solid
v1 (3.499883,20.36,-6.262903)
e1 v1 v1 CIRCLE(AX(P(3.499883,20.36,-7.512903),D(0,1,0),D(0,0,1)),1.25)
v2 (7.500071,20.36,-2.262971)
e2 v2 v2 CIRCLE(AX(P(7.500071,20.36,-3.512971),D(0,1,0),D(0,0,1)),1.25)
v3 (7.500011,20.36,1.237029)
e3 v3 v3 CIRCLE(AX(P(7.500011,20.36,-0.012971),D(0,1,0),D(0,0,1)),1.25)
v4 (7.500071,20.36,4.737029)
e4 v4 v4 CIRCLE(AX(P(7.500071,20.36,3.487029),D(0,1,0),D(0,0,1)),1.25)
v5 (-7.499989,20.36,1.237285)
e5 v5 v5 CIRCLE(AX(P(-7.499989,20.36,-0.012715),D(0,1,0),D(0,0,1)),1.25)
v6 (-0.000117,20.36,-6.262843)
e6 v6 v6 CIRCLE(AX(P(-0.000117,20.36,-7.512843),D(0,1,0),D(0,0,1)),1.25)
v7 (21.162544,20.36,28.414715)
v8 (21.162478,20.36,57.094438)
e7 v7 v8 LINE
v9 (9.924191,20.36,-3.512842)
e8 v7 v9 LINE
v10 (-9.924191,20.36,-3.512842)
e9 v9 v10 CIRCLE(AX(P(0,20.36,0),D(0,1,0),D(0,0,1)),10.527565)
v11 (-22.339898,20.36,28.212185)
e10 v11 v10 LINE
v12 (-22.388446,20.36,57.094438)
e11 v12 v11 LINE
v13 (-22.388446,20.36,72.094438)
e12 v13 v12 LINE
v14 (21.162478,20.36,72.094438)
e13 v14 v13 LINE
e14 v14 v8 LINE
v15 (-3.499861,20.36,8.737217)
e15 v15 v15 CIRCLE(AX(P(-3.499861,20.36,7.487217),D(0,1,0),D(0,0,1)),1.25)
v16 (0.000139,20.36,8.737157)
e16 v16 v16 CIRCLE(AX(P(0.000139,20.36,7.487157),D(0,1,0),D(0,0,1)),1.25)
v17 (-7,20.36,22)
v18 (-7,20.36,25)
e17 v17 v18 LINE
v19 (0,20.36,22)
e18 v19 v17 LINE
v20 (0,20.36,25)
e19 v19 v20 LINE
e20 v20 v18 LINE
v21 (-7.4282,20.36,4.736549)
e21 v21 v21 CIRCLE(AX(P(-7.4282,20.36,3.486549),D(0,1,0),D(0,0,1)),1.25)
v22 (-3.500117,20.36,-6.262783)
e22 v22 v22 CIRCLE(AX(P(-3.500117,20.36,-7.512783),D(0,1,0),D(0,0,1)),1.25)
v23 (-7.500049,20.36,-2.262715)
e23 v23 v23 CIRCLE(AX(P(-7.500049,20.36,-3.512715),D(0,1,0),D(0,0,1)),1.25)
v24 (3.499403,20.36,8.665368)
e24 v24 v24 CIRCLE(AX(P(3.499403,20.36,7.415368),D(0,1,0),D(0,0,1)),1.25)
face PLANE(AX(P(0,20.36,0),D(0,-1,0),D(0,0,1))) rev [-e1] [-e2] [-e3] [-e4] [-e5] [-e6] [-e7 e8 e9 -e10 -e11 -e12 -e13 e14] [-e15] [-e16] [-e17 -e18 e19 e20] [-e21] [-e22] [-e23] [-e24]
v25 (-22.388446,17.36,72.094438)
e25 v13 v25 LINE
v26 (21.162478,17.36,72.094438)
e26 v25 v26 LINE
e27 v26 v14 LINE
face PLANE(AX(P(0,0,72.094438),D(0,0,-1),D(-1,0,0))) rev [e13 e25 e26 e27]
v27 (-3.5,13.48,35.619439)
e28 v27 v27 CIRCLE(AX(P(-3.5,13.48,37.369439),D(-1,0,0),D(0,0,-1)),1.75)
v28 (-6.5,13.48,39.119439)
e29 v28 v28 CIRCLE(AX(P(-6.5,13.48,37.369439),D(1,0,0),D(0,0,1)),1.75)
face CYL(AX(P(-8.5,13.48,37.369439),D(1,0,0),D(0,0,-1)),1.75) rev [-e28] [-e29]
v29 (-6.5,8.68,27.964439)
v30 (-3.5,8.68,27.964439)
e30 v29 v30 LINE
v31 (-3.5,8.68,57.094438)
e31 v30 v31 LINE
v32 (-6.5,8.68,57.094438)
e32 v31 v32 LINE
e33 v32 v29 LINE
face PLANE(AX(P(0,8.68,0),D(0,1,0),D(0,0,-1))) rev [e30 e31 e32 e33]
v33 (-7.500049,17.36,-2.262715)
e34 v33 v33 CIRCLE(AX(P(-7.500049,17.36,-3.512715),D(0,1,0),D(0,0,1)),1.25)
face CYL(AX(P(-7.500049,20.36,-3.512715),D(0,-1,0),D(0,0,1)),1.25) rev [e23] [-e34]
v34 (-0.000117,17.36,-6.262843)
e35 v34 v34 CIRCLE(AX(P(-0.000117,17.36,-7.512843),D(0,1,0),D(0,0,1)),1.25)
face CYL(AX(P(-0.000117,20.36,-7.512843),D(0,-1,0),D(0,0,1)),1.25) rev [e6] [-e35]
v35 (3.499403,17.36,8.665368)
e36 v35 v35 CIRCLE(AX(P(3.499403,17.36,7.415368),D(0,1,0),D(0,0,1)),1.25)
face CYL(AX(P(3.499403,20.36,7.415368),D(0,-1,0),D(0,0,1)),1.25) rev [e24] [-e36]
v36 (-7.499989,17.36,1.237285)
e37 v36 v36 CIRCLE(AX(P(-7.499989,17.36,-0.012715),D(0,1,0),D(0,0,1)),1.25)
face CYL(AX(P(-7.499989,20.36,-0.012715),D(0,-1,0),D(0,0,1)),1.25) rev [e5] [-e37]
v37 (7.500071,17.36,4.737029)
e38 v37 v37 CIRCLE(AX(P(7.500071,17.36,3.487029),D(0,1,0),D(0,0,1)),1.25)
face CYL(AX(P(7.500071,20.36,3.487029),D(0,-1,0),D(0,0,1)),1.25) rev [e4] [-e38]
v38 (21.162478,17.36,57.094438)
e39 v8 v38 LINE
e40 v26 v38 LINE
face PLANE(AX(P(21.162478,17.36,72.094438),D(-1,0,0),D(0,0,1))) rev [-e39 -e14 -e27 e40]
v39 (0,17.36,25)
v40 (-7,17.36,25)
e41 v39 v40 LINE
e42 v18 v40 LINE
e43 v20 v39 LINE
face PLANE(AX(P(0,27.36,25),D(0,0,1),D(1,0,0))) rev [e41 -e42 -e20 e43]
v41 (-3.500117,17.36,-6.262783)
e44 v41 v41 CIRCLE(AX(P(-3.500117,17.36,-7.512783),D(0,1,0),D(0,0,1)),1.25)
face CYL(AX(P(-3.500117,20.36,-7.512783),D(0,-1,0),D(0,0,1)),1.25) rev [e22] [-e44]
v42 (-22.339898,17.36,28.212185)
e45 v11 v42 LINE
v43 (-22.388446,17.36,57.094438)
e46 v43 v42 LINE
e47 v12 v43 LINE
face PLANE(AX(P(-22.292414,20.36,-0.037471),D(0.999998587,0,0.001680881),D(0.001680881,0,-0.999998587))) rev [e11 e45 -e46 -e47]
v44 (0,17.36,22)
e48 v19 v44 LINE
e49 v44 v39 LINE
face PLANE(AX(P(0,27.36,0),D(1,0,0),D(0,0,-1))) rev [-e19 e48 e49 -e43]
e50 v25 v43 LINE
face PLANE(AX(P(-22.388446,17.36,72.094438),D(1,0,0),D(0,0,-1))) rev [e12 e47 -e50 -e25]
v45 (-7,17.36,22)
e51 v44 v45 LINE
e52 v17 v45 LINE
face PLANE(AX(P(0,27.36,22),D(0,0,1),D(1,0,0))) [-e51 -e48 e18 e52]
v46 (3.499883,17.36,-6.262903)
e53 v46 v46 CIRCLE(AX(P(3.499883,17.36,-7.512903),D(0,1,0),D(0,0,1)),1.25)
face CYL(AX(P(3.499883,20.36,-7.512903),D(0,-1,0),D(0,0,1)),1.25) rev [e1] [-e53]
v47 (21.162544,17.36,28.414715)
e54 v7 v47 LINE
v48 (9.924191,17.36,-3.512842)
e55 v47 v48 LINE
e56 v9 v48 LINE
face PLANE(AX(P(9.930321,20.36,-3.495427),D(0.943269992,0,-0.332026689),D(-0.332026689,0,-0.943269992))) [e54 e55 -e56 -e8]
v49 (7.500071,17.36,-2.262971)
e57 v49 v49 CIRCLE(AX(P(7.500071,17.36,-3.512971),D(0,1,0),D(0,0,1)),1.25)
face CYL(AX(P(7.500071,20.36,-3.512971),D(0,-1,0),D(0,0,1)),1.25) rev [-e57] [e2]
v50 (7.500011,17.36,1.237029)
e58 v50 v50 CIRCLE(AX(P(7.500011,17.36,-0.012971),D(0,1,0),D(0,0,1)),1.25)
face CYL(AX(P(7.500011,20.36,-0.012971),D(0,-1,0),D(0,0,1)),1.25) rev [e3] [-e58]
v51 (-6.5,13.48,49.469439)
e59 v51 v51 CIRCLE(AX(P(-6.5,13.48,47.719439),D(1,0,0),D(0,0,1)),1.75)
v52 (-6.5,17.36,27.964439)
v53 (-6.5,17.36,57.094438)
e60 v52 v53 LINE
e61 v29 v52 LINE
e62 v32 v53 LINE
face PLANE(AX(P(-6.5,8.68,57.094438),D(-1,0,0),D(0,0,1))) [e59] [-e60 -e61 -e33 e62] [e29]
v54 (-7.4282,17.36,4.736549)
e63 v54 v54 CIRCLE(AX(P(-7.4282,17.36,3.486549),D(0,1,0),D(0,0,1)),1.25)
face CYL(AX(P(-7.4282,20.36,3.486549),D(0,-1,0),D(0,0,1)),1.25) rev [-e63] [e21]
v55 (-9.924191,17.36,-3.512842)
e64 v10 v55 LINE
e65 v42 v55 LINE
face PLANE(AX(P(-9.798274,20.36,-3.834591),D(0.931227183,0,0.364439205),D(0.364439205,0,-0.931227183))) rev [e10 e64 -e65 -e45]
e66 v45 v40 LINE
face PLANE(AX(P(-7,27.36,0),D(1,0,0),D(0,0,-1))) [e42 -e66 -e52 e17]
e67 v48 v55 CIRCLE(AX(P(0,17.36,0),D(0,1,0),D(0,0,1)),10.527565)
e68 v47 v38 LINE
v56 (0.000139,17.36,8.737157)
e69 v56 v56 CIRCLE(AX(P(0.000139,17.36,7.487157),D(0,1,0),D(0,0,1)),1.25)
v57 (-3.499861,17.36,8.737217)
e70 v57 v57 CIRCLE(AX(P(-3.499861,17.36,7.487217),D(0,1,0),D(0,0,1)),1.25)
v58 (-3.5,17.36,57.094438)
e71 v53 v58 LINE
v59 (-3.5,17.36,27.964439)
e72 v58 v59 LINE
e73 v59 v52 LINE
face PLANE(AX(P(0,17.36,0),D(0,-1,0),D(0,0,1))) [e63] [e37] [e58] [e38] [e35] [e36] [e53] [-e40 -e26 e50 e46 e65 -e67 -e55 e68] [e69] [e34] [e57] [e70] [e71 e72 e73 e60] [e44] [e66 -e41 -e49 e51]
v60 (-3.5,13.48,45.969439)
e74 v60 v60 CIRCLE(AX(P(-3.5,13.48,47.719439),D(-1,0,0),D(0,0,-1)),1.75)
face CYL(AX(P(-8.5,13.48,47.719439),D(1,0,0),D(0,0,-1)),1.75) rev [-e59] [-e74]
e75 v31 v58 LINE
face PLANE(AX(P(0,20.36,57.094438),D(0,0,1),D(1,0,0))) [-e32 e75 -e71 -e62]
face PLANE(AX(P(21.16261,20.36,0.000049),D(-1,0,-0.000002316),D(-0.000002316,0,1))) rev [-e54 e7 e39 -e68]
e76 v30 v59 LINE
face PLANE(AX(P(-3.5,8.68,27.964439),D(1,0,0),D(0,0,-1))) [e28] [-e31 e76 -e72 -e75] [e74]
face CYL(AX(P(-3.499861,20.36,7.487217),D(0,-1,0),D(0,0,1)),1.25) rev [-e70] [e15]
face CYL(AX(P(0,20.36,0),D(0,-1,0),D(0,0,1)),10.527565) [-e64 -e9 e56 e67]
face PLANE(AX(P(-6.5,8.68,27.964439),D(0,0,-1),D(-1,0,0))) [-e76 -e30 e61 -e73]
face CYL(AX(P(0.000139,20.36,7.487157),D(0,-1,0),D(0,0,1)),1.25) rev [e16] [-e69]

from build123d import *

# Parameters (mm, degrees)
SKETCH2_R           = 1.25
BOSS_EXTRUDE1_DEPTH = 3
SKETCH6_W           = 3
SKETCH6_H           = 29.12999922
BOSS_EXTRUDE3_DEPTH = 11.68
SKETCH9_R           = 1.75
CUT_EXTRUDE2_DEPTH  = 5
SKETCH10_W          = 43.550923211
SKETCH10_H          = 3
BOSS_EXTRUDE4_DEPTH = 15
SKETCH11_W          = 7
SKETCH11_H          = 3
CUT_EXTRUDE3_DEPTH  = 10


with BuildPart() as part:
    # Sketch2 → Boss-Extrude1 (new body)
    with BuildSketch(Plane(origin=(0, 0, 0), x_dir=(1, 0, 0), z_dir=(0, 1, 0))):
        with BuildLine():
            ThreePointArc((9.924191255, 3.512841719), (0, 10.527565199), (-9.924191255, 3.512841719))
            Line((-9.924191255, 3.512841719), (-22.339897891, -28.212185032))
            Line((-22.339897891, -28.212185032), (-22.388445596, -57.094438481))
            Line((-22.388445596, -57.094438481), (21.162477615, -57.094438481))
            Line((21.162477615, -57.094438481), (21.162544036, -28.414715022))
            Line((21.162544036, -28.414715022), (9.924191255, 3.512841719))
        make_face()
        with Locations((-3.499861001, -7.487216855)):
            Circle(SKETCH2_R, mode=Mode.SUBTRACT)
        with Locations((-7.42819985, -3.486548919)):
            Circle(SKETCH2_R, mode=Mode.SUBTRACT)
        with Locations((-7.499989222, 0.012714758)):
            Circle(SKETCH2_R, mode=Mode.SUBTRACT)
        with Locations((-7.500049059, 3.512714758)):
            Circle(SKETCH2_R, mode=Mode.SUBTRACT)
        with Locations((-3.500117445, 7.512783142)):
            Circle(SKETCH2_R, mode=Mode.SUBTRACT)
        with Locations((0.000138999, -7.487157018)):
            Circle(SKETCH2_R, mode=Mode.SUBTRACT)
        with Locations((3.499402676, -7.415367646)):
            Circle(SKETCH2_R, mode=Mode.SUBTRACT)
        with Locations((7.500070612, -3.487028797)):
            Circle(SKETCH2_R, mode=Mode.SUBTRACT)
        with Locations((7.500010775, 0.012971203)):
            Circle(SKETCH2_R, mode=Mode.SUBTRACT)
        with Locations((-0.000117446, 7.512842979)):
            Circle(SKETCH2_R, mode=Mode.SUBTRACT)
        with Locations((3.499882554, 7.512902816)):
            Circle(SKETCH2_R, mode=Mode.SUBTRACT)
        with Locations((7.500070612, 3.512971202)):
            Circle(SKETCH2_R, mode=Mode.SUBTRACT)
    extrude(amount=-BOSS_EXTRUDE1_DEPTH)

    # Sketch6 → Boss-Extrude3 (add)
    with BuildSketch(Plane.XZ.offset(3)):
        with Locations((-5, 42.529438871)):
            Rectangle(SKETCH6_W, SKETCH6_H)
    extrude(amount=-BOSS_EXTRUDE3_DEPTH)

    # Sketch9 → Cut-Extrude2 (cut)
    with BuildSketch(Plane(origin=(-3.5, 0, 0), x_dir=(0, 0, -1), z_dir=(1, 0, 0))):
        with Locations((-37.369439261, 3.88)):
            Circle(SKETCH9_R)
        with Locations((-47.719439261, 3.88)):
            Circle(SKETCH9_R)
    extrude(amount=-CUT_EXTRUDE2_DEPTH, mode=Mode.SUBTRACT)


with BuildPart() as body_2:
    # Mirror1: mirrored copy
    add(part.part.mirror(Plane(origin=(0, 8.68, 0), x_dir=(0, 0, 1), z_dir=(0, -1, 0))))

    # Sketch10 → Boss-Extrude4 (add)
    with BuildSketch(Plane.XY.offset(57.094438481)):
        with Locations((-0.612983991, 18.86)):
            Rectangle(SKETCH10_W, SKETCH10_H)
    extrude(amount=BOSS_EXTRUDE4_DEPTH)

    # Sketch11 → Cut-Extrude3 (cut)
    with BuildSketch(Plane.XZ.offset(-17.36)):
        with Locations((-3.5, 23.5)):
            Rectangle(SKETCH11_W, SKETCH11_H)
    extrude(amount=-CUT_EXTRUDE3_DEPTH, mode=Mode.SUBTRACT)


solid = body_2.part
